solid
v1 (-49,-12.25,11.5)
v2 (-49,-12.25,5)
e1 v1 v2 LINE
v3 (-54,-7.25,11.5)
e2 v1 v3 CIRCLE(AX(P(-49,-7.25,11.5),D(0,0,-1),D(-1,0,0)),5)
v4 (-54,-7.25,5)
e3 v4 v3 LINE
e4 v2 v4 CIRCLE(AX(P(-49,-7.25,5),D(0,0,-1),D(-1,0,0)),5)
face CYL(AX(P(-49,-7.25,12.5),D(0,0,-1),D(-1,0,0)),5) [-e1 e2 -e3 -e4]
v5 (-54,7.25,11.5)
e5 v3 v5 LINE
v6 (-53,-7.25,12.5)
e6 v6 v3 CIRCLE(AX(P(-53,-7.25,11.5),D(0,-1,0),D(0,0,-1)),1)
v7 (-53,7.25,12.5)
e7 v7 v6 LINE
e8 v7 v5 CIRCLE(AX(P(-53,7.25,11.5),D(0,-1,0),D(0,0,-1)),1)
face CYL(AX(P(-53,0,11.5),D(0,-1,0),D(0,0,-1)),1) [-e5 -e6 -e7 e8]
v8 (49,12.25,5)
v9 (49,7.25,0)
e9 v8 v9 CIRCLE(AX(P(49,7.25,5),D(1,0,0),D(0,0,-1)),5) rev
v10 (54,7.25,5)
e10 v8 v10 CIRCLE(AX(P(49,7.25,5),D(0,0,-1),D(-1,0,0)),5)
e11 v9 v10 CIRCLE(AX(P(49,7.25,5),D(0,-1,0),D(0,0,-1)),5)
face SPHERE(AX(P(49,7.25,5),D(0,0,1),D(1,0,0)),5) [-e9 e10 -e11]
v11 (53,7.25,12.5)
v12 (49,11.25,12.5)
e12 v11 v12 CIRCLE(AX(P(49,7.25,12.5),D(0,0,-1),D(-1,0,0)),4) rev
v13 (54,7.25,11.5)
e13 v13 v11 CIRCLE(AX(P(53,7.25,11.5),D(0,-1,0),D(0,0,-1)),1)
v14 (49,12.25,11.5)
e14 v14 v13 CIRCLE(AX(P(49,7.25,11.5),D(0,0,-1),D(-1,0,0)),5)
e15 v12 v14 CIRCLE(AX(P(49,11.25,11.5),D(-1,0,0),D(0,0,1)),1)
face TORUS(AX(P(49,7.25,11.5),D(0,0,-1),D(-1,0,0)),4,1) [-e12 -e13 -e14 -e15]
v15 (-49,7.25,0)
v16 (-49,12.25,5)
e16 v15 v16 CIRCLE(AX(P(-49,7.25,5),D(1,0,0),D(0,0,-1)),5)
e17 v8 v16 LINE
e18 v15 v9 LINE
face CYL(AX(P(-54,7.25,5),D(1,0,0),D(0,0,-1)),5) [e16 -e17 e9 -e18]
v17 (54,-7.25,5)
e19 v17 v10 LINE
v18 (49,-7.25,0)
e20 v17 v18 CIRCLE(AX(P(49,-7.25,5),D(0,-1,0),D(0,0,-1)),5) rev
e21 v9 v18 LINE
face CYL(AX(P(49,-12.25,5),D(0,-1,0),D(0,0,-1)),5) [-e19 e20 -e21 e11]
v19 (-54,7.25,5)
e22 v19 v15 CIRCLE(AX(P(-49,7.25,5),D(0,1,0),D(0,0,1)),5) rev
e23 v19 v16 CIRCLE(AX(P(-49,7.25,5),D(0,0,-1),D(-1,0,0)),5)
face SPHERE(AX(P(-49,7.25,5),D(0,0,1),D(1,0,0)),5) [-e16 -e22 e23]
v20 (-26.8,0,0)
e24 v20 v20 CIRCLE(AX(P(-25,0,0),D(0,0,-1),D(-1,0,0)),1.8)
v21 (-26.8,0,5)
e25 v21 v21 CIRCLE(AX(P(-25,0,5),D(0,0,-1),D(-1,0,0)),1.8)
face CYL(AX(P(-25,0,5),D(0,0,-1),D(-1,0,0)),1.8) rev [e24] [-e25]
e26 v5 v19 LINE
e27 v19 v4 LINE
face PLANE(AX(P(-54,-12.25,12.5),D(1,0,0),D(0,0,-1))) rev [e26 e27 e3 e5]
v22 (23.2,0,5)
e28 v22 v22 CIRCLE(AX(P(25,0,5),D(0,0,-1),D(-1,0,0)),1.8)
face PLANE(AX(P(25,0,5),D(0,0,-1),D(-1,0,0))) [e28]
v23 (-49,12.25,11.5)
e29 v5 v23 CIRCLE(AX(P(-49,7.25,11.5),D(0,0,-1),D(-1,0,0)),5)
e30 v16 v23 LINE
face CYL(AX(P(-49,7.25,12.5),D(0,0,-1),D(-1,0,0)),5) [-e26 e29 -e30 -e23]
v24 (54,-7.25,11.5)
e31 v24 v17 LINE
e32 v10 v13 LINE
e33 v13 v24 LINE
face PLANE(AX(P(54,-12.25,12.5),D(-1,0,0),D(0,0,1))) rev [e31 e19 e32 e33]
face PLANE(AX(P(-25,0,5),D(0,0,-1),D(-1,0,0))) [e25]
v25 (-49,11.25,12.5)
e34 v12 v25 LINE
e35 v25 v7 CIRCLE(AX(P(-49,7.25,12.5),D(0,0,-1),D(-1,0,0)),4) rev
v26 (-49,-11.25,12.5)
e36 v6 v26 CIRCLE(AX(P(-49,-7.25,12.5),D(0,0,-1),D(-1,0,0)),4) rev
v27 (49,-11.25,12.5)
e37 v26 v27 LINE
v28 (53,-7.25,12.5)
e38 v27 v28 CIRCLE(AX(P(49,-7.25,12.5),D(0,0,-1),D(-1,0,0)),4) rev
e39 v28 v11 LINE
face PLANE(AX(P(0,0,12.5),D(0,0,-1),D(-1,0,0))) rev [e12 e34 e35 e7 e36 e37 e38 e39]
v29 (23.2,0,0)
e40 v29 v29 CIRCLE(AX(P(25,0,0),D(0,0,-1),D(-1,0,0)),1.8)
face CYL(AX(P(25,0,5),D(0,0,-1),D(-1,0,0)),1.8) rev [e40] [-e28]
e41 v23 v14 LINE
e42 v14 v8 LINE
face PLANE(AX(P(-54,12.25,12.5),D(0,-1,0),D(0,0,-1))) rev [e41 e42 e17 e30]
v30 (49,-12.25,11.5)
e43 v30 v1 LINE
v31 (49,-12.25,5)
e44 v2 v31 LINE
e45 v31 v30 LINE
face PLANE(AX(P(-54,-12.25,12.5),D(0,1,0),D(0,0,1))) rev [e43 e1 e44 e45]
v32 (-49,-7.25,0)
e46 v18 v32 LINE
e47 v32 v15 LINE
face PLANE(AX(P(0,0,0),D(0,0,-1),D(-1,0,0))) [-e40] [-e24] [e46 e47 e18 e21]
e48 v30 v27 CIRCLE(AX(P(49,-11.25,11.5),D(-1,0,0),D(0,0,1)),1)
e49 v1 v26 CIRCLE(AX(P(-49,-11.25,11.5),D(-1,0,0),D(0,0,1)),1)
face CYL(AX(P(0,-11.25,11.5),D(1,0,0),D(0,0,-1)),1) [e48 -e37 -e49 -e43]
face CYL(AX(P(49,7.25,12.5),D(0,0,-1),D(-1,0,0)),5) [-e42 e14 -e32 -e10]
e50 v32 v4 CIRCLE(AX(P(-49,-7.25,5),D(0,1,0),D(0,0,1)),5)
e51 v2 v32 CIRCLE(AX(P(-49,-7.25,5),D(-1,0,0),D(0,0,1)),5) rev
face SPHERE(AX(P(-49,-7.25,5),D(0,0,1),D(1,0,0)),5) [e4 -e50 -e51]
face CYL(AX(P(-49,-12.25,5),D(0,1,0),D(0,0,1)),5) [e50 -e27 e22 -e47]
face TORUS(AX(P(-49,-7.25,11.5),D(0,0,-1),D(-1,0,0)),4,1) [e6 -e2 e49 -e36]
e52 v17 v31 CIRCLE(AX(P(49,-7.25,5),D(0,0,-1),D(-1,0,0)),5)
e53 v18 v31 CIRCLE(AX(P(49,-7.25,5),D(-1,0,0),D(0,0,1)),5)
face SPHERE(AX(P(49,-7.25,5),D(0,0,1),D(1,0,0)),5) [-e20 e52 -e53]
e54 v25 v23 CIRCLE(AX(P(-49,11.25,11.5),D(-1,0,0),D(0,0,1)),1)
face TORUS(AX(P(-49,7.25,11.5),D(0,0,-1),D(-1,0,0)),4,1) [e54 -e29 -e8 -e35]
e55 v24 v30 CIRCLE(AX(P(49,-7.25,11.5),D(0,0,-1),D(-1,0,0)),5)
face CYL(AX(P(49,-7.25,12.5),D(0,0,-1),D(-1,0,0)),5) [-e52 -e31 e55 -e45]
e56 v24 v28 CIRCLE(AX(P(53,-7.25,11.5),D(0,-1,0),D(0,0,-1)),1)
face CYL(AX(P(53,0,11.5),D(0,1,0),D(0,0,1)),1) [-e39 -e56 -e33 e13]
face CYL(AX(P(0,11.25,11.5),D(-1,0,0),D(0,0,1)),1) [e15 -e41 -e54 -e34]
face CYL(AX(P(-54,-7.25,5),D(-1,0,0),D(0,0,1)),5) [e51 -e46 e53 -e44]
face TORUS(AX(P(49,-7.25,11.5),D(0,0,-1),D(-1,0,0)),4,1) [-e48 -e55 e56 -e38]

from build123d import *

# Parameters (mm, degrees)
SKETCH1_W           = 108
SKETCH1_H           = 24.5
BOSS_EXTRUDE1_DEPTH = 12.5
FILLET1_R           = 5
SKETCH2_R           = 1.8
CUT_EXTRUDE1_DEPTH  = 5
FILLET2_R           = 5
FILLET3_R           = 1


with BuildPart() as part:
    # Sketch1 → Boss-Extrude1 (new body)
    with BuildSketch(Plane.XY):
        Rectangle(SKETCH1_W, SKETCH1_H)
    extrude(amount=BOSS_EXTRUDE1_DEPTH)

    # Fillet1
    fillet1_edges = [part.edges().sort_by_distance(p)[0] for p in [
        (0, -12.25, 0),
        (-54, 0, 0),
        (0, 12.25, 0),
        (54, 0, 0),
    ]]
    fillet(fillet1_edges, radius=FILLET1_R)

    # Sketch2 → Cut-Extrude1 (cut)
    with BuildSketch(Plane(origin=(0, 0, 0), x_dir=(-1, 0, 0), z_dir=(0, 0, -1))):
        with Locations((-25, 0)):
            Circle(SKETCH2_R)
        with Locations((25, 0)):
            Circle(SKETCH2_R)
    extrude(amount=-CUT_EXTRUDE1_DEPTH, mode=Mode.SUBTRACT)

    # Fillet2
    # the kernel refuses this fillet: 5 mm, written as the material it takes off along each edge
    with BuildSketch(Plane(origin=(49, 7.25, 5), x_dir=(0, 1, 0), z_dir=(1, 0, 0))) as fillet2_piece_1_section:
        Polygon((0, 0), (FILLET2_R, 0), (FILLET2_R, -FILLET2_R), (0, -FILLET2_R), align=None)
    fillet2_piece_1 = extrude(amount=FILLET2_R, mode=Mode.PRIVATE)
    fillet2_piece_1 = fillet2_piece_1 - Plane(origin=(49, 7.25, 5), x_dir=(0, -0.7071067811865475, 0.7071067811865475), z_dir=(1, 0, 0)) * Sphere(FILLET2_R, mode=Mode.PRIVATE)
    add(fillet2_piece_1, mode=Mode.SUBTRACT)
    with BuildSketch(Plane(origin=(49, -7.25, 5), x_dir=(1, 0, 0), z_dir=(0, -1, 0))) as fillet2_piece_2_section:
        Polygon((0, 0), (FILLET2_R, 0), (FILLET2_R, -FILLET2_R), (0, -FILLET2_R), align=None)
    fillet2_piece_2 = extrude(amount=FILLET2_R, mode=Mode.PRIVATE)
    fillet2_piece_2 = fillet2_piece_2 - Plane(origin=(49, -7.25, 5), x_dir=(-0.7071067811865475, 0, 0.7071067811865475), z_dir=(0, -1, 0)) * Sphere(FILLET2_R, mode=Mode.PRIVATE)
    add(fillet2_piece_2, mode=Mode.SUBTRACT)
    with BuildSketch(Plane(origin=(-49, 7.25, 5), x_dir=(0, 1, 0), z_dir=(-1, 0, 0))) as fillet2_piece_3_section:
        Polygon((0, 0), (FILLET2_R, 0), (FILLET2_R, FILLET2_R), (0, FILLET2_R), align=None)
    fillet2_piece_3 = extrude(amount=FILLET2_R, mode=Mode.PRIVATE)
    fillet2_piece_3 = fillet2_piece_3 - Plane(origin=(-49, 7.25, 5), x_dir=(0, -0.7071067811865475, 0.7071067811865475), z_dir=(-1, 0, 0)) * Sphere(FILLET2_R, mode=Mode.PRIVATE)
    add(fillet2_piece_3, mode=Mode.SUBTRACT)
    with BuildSketch(Plane(origin=(-49, -7.25, 5), x_dir=(-1, 0, 0), z_dir=(0, -1, 0))) as fillet2_piece_4_section:
        Polygon((0, 0), (FILLET2_R, 0), (FILLET2_R, FILLET2_R), (0, FILLET2_R), align=None)
    fillet2_piece_4 = extrude(amount=FILLET2_R, mode=Mode.PRIVATE)
    fillet2_piece_4 = fillet2_piece_4 - Plane(origin=(-49, -7.25, 5), x_dir=(0.7071067811865475, 0, 0.7071067811865475), z_dir=(0, -1, 0)) * Sphere(FILLET2_R, mode=Mode.PRIVATE)
    add(fillet2_piece_4, mode=Mode.SUBTRACT)
    with BuildSketch(Plane(origin=(54, -12.25, 5), x_dir=(-1, 0, 0), z_dir=(0, 0, 1)), Plane(origin=(54, 12.25, 5), x_dir=(0, -1, 0), z_dir=(0, 0, 1))) as fillet2_piece_5:
        with BuildLine():
            CenterArc((FILLET2_R, -FILLET2_R), FILLET2_R, 90, 90)
            Line((0, -FILLET2_R), (0, 0))
            Line((0, 0), (FILLET2_R, 0))
        make_face()
    extrude(amount=20, mode=Mode.SUBTRACT)
    with BuildSketch(Plane(origin=(-54, -12.25, 5), x_dir=(1, 0, 0), z_dir=(0, 0, 1)), Plane(origin=(-54, 12.25, 5), x_dir=(0, -1, 0), z_dir=(0, 0, 1))) as fillet2_piece_6:
        with BuildLine():
            CenterArc((FILLET2_R, FILLET2_R), FILLET2_R, 180, 90)
            Line((0, FILLET2_R), (0, 0))
            Line((0, 0), (FILLET2_R, 0))
        make_face()
    extrude(amount=20, mode=Mode.SUBTRACT)

    # Fillet3
    fillet3_edges = [part.edges().sort_by_distance(p)[0] for p in [
        (0, -12.25, 12.5),
        (-54, 0, 12.5),
        (54, 0, 12.5),
        (0, 12.25, 12.5),
        (52.535533906, 10.785533906, 12.5),
        (52.535533906, -10.785533906, 12.5),
        (-52.535533906, 10.785533906, 12.5),
        (-52.535533906, -10.785533906, 12.5),
    ]]
    fillet(fillet3_edges, radius=FILLET3_R)


solid = part.part
